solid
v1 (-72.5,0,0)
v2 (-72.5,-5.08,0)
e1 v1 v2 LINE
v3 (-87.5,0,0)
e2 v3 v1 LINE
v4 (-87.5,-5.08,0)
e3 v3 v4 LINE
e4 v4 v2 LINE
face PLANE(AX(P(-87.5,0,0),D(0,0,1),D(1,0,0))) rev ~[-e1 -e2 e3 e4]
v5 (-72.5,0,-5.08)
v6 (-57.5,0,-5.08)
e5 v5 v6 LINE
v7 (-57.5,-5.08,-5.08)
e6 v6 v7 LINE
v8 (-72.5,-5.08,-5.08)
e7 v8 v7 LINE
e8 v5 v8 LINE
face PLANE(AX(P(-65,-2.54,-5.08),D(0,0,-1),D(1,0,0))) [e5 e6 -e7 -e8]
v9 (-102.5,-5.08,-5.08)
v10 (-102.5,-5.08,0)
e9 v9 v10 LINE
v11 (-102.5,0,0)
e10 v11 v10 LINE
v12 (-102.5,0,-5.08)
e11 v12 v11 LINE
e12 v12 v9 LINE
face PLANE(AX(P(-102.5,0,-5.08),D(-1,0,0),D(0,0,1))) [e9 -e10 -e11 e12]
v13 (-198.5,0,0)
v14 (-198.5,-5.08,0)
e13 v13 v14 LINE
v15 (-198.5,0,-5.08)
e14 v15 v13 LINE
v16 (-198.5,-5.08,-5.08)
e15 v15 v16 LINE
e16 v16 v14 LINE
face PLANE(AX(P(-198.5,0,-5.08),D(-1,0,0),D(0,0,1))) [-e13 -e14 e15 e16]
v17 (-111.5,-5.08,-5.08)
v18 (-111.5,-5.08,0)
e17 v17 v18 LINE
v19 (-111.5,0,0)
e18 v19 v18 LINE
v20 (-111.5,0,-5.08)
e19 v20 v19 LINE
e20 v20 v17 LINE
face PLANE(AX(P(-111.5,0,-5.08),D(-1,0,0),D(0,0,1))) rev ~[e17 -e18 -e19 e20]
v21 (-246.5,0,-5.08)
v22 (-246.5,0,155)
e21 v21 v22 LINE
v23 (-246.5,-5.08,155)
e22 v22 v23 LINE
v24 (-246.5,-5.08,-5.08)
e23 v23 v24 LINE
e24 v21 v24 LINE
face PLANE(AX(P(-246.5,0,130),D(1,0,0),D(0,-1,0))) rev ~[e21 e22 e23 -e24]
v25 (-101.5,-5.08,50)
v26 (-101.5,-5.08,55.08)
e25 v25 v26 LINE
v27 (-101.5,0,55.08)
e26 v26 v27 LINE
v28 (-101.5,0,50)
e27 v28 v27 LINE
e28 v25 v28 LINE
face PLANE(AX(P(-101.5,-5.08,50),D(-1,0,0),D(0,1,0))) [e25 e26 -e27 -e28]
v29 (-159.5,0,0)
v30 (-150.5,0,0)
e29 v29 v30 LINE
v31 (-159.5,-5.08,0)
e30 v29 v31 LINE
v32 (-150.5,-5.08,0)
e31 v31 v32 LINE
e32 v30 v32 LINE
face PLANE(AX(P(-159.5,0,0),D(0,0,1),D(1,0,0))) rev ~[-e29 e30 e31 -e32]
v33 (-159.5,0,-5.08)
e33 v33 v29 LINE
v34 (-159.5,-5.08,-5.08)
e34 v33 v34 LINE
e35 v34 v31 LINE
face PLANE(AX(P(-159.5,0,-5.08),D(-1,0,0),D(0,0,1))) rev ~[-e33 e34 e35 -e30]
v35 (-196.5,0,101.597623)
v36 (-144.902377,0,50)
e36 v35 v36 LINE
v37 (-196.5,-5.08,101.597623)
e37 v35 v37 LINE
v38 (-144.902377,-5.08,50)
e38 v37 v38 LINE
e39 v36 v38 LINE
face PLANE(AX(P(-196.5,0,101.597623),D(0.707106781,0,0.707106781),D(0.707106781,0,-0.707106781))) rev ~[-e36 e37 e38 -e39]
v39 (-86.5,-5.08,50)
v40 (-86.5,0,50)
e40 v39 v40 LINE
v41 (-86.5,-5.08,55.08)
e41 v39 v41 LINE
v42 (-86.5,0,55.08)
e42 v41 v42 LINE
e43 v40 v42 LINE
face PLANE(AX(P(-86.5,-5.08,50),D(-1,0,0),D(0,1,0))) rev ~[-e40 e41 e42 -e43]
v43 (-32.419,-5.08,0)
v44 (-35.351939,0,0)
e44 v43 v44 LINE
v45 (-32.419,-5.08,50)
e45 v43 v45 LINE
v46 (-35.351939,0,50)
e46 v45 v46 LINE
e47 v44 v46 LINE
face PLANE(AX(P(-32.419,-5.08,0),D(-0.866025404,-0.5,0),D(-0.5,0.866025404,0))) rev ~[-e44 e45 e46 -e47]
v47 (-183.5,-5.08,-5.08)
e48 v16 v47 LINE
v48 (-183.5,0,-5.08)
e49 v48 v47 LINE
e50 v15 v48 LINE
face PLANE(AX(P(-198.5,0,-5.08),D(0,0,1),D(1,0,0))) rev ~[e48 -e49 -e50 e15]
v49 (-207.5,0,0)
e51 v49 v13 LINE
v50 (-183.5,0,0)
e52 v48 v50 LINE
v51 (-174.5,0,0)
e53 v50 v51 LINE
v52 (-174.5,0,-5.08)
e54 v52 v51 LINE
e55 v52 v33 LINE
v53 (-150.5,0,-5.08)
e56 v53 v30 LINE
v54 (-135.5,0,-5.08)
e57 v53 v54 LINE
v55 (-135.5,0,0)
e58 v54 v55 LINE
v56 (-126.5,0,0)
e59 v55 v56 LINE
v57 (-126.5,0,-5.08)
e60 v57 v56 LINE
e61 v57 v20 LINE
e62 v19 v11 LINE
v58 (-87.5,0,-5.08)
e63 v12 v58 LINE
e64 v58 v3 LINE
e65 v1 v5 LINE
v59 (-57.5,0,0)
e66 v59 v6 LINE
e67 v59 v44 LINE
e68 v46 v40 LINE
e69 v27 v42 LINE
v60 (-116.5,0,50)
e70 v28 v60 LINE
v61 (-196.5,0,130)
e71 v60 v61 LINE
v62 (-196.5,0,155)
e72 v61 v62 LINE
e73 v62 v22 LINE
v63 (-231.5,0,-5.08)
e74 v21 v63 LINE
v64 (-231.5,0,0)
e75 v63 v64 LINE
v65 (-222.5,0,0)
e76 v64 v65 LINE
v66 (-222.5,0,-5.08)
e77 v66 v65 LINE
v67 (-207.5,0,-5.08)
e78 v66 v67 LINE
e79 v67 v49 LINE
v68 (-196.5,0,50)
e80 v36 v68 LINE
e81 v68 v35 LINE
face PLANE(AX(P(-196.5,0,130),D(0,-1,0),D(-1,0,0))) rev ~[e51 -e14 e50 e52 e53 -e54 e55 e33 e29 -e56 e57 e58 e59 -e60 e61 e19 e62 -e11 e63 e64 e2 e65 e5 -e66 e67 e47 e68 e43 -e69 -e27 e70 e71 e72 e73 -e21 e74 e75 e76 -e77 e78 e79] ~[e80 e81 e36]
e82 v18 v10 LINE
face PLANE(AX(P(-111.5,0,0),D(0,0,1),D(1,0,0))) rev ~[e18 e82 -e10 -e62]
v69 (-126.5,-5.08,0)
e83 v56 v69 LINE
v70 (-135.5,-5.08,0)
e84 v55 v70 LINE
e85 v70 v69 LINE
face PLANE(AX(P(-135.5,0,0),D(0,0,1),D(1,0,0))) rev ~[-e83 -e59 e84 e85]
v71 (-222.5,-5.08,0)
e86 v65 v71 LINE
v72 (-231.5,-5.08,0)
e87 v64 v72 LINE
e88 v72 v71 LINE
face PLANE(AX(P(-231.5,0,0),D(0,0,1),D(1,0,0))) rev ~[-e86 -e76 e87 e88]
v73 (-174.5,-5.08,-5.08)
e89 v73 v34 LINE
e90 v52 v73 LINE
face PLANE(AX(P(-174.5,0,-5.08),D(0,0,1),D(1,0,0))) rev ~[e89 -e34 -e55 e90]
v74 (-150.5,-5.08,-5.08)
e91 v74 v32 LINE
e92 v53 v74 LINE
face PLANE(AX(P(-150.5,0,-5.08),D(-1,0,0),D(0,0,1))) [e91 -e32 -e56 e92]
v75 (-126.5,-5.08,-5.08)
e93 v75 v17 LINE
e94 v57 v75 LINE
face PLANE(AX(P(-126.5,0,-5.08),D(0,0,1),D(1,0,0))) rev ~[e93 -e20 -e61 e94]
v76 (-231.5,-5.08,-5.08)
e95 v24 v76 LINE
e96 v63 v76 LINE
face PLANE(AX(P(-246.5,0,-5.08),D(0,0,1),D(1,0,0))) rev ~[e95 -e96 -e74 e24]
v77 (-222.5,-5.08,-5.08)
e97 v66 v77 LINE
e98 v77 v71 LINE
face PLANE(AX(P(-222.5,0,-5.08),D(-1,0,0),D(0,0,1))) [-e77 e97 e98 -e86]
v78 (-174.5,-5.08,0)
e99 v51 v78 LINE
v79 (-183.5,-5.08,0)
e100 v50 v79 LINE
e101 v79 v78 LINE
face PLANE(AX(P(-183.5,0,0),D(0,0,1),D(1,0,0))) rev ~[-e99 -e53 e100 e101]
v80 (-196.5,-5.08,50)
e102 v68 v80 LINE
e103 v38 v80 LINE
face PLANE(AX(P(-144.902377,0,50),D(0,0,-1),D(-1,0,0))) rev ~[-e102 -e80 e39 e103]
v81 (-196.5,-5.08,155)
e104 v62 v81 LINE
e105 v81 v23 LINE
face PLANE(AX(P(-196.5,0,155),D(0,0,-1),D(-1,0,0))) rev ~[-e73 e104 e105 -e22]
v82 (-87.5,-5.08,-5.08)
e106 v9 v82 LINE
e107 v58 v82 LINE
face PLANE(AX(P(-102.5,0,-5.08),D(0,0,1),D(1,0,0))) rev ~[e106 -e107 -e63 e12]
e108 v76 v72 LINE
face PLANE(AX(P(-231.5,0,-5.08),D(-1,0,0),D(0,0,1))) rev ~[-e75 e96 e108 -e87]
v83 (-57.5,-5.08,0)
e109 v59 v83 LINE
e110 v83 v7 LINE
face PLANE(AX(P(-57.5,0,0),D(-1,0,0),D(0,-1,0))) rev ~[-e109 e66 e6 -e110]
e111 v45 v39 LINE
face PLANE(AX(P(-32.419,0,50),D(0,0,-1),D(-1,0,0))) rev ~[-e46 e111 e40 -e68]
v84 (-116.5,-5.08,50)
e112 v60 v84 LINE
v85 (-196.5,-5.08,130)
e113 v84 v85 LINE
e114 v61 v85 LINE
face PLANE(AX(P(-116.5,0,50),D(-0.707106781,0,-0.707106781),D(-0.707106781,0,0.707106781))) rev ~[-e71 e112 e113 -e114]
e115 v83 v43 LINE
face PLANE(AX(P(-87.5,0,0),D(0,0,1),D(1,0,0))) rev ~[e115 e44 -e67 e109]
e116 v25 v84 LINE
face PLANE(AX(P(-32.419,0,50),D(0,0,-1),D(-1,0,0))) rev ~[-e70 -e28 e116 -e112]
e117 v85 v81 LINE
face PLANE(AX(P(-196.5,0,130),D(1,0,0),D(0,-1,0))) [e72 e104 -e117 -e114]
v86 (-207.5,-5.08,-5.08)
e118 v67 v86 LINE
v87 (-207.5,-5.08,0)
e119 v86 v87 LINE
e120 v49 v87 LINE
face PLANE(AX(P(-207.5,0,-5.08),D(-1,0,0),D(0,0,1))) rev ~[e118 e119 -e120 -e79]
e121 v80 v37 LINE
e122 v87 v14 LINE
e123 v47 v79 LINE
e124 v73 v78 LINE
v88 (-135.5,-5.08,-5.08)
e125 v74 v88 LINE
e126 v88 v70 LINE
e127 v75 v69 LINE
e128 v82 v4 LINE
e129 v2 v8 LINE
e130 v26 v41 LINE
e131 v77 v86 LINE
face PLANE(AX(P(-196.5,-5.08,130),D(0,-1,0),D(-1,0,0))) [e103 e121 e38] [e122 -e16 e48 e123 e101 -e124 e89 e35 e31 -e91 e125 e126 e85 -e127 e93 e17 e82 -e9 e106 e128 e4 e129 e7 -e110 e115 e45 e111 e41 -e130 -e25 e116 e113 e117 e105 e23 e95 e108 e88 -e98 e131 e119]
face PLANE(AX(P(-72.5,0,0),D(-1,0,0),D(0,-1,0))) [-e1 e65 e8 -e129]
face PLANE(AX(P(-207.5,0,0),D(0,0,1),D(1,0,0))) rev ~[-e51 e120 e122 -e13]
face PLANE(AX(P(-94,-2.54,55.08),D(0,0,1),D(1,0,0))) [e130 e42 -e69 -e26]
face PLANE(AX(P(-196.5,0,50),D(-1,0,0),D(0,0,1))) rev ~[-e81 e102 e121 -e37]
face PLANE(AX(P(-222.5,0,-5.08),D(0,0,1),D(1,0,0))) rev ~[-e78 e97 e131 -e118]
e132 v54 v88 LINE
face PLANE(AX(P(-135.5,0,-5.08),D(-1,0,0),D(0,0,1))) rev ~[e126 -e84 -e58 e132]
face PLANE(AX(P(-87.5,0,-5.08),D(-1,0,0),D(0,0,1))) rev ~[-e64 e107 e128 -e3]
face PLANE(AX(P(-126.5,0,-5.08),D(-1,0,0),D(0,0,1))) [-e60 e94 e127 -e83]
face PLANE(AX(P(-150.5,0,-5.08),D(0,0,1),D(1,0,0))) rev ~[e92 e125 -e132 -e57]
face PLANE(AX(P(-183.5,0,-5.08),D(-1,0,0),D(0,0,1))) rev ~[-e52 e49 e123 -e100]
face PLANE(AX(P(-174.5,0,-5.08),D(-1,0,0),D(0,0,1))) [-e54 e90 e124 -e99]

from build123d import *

# Parameters (mm, degrees)
F0_W     = 15
F0_H     = 5.08
F1_DEPTH = 5.08
F2_DEPTH = 25
F4_DEPTH = 58
F5_W     = 15
F5_H     = 5.08
F6_DEPTH = 5.08
F7_W     = 15
F7_H     = 5.08
F8_DEPTH = 5.08


# Not quite as in the source:
# - a feature names something its author has since deleted; it is built from what else it names


with BuildPart() as f1:
    # F0 (on Front) → F1 (new body)
    with BuildSketch(Plane.XZ):
        Polygon((-87.5, 0), (-32.419, 0), (-32.419, 50), (-116.5, 50), (-144.9023774395, 50), (-196.5, 50), (-196.5, 101.5976225605), (-196.5, 130), (-246.5, 130), (-246.5, 0), (-231.5, 0), (-222.5, 0), (-207.5, 0), (-198.5, 0), (-183.5, 0), (-174.5, 0), (-159.5, 0), (-150.5, 0), (-135.5, 0), (-126.5, 0), (-111.5, 0), (-102.5, 0), align=None)
        with Locations((-95, -2.54)):
            Rectangle(F0_W, F0_H)
        Polygon((-144.9023774395, 50), (-116.5, 50), (-196.5, 130), (-196.5, 101.5976225605), align=None)
        with Locations((-119, -2.54)):
            Rectangle(F0_W, F0_H)
        with Locations((-143, -2.54)):
            Rectangle(F0_W, F0_H)
        with Locations((-239, -2.54)):
            Rectangle(F0_W, F0_H)
        with Locations((-167, -2.54)):
            Rectangle(F0_W, F0_H)
        with Locations((-215, -2.54)):
            Rectangle(F0_W, F0_H)
        with Locations((-191, -2.54)):
            Rectangle(F0_W, F0_H)
    extrude(amount=F1_DEPTH)

    # F2 (add): a face of the model
    f2_faces = [f1.faces().sort_by_distance(p)[0] for p in [
        (-221.5, -2.54, 130),
    ]]
    extrude(f2_faces, amount=F2_DEPTH)

    # F3 (on face) → F4 (cut)
    with BuildSketch(Plane(origin=(0, 0, 0), x_dir=(1, 0, 0), z_dir=(0, 0, -1))):
        Polygon((-32.419, 0), (-32.419, 5.08), (-35.3519393675, 0), align=None)
    extrude(amount=-F4_DEPTH, mode=Mode.SUBTRACT)

    # F5 (on face) → F6 (join)
    with BuildSketch(Plane(origin=(0, 0, 0), x_dir=(1, 0, 0), z_dir=(0, 0, -1))):
        with Locations((-65, 2.54)):
            Rectangle(F5_W, F5_H)
    extrude(amount=F6_DEPTH)

    # F7 (on face) → F8 (join)
    with BuildSketch(Plane.XY.offset(50)):
        with Locations((-94, -2.54)):
            Rectangle(F7_W, F7_H)
    extrude(amount=F8_DEPTH)


solid = f1.part
